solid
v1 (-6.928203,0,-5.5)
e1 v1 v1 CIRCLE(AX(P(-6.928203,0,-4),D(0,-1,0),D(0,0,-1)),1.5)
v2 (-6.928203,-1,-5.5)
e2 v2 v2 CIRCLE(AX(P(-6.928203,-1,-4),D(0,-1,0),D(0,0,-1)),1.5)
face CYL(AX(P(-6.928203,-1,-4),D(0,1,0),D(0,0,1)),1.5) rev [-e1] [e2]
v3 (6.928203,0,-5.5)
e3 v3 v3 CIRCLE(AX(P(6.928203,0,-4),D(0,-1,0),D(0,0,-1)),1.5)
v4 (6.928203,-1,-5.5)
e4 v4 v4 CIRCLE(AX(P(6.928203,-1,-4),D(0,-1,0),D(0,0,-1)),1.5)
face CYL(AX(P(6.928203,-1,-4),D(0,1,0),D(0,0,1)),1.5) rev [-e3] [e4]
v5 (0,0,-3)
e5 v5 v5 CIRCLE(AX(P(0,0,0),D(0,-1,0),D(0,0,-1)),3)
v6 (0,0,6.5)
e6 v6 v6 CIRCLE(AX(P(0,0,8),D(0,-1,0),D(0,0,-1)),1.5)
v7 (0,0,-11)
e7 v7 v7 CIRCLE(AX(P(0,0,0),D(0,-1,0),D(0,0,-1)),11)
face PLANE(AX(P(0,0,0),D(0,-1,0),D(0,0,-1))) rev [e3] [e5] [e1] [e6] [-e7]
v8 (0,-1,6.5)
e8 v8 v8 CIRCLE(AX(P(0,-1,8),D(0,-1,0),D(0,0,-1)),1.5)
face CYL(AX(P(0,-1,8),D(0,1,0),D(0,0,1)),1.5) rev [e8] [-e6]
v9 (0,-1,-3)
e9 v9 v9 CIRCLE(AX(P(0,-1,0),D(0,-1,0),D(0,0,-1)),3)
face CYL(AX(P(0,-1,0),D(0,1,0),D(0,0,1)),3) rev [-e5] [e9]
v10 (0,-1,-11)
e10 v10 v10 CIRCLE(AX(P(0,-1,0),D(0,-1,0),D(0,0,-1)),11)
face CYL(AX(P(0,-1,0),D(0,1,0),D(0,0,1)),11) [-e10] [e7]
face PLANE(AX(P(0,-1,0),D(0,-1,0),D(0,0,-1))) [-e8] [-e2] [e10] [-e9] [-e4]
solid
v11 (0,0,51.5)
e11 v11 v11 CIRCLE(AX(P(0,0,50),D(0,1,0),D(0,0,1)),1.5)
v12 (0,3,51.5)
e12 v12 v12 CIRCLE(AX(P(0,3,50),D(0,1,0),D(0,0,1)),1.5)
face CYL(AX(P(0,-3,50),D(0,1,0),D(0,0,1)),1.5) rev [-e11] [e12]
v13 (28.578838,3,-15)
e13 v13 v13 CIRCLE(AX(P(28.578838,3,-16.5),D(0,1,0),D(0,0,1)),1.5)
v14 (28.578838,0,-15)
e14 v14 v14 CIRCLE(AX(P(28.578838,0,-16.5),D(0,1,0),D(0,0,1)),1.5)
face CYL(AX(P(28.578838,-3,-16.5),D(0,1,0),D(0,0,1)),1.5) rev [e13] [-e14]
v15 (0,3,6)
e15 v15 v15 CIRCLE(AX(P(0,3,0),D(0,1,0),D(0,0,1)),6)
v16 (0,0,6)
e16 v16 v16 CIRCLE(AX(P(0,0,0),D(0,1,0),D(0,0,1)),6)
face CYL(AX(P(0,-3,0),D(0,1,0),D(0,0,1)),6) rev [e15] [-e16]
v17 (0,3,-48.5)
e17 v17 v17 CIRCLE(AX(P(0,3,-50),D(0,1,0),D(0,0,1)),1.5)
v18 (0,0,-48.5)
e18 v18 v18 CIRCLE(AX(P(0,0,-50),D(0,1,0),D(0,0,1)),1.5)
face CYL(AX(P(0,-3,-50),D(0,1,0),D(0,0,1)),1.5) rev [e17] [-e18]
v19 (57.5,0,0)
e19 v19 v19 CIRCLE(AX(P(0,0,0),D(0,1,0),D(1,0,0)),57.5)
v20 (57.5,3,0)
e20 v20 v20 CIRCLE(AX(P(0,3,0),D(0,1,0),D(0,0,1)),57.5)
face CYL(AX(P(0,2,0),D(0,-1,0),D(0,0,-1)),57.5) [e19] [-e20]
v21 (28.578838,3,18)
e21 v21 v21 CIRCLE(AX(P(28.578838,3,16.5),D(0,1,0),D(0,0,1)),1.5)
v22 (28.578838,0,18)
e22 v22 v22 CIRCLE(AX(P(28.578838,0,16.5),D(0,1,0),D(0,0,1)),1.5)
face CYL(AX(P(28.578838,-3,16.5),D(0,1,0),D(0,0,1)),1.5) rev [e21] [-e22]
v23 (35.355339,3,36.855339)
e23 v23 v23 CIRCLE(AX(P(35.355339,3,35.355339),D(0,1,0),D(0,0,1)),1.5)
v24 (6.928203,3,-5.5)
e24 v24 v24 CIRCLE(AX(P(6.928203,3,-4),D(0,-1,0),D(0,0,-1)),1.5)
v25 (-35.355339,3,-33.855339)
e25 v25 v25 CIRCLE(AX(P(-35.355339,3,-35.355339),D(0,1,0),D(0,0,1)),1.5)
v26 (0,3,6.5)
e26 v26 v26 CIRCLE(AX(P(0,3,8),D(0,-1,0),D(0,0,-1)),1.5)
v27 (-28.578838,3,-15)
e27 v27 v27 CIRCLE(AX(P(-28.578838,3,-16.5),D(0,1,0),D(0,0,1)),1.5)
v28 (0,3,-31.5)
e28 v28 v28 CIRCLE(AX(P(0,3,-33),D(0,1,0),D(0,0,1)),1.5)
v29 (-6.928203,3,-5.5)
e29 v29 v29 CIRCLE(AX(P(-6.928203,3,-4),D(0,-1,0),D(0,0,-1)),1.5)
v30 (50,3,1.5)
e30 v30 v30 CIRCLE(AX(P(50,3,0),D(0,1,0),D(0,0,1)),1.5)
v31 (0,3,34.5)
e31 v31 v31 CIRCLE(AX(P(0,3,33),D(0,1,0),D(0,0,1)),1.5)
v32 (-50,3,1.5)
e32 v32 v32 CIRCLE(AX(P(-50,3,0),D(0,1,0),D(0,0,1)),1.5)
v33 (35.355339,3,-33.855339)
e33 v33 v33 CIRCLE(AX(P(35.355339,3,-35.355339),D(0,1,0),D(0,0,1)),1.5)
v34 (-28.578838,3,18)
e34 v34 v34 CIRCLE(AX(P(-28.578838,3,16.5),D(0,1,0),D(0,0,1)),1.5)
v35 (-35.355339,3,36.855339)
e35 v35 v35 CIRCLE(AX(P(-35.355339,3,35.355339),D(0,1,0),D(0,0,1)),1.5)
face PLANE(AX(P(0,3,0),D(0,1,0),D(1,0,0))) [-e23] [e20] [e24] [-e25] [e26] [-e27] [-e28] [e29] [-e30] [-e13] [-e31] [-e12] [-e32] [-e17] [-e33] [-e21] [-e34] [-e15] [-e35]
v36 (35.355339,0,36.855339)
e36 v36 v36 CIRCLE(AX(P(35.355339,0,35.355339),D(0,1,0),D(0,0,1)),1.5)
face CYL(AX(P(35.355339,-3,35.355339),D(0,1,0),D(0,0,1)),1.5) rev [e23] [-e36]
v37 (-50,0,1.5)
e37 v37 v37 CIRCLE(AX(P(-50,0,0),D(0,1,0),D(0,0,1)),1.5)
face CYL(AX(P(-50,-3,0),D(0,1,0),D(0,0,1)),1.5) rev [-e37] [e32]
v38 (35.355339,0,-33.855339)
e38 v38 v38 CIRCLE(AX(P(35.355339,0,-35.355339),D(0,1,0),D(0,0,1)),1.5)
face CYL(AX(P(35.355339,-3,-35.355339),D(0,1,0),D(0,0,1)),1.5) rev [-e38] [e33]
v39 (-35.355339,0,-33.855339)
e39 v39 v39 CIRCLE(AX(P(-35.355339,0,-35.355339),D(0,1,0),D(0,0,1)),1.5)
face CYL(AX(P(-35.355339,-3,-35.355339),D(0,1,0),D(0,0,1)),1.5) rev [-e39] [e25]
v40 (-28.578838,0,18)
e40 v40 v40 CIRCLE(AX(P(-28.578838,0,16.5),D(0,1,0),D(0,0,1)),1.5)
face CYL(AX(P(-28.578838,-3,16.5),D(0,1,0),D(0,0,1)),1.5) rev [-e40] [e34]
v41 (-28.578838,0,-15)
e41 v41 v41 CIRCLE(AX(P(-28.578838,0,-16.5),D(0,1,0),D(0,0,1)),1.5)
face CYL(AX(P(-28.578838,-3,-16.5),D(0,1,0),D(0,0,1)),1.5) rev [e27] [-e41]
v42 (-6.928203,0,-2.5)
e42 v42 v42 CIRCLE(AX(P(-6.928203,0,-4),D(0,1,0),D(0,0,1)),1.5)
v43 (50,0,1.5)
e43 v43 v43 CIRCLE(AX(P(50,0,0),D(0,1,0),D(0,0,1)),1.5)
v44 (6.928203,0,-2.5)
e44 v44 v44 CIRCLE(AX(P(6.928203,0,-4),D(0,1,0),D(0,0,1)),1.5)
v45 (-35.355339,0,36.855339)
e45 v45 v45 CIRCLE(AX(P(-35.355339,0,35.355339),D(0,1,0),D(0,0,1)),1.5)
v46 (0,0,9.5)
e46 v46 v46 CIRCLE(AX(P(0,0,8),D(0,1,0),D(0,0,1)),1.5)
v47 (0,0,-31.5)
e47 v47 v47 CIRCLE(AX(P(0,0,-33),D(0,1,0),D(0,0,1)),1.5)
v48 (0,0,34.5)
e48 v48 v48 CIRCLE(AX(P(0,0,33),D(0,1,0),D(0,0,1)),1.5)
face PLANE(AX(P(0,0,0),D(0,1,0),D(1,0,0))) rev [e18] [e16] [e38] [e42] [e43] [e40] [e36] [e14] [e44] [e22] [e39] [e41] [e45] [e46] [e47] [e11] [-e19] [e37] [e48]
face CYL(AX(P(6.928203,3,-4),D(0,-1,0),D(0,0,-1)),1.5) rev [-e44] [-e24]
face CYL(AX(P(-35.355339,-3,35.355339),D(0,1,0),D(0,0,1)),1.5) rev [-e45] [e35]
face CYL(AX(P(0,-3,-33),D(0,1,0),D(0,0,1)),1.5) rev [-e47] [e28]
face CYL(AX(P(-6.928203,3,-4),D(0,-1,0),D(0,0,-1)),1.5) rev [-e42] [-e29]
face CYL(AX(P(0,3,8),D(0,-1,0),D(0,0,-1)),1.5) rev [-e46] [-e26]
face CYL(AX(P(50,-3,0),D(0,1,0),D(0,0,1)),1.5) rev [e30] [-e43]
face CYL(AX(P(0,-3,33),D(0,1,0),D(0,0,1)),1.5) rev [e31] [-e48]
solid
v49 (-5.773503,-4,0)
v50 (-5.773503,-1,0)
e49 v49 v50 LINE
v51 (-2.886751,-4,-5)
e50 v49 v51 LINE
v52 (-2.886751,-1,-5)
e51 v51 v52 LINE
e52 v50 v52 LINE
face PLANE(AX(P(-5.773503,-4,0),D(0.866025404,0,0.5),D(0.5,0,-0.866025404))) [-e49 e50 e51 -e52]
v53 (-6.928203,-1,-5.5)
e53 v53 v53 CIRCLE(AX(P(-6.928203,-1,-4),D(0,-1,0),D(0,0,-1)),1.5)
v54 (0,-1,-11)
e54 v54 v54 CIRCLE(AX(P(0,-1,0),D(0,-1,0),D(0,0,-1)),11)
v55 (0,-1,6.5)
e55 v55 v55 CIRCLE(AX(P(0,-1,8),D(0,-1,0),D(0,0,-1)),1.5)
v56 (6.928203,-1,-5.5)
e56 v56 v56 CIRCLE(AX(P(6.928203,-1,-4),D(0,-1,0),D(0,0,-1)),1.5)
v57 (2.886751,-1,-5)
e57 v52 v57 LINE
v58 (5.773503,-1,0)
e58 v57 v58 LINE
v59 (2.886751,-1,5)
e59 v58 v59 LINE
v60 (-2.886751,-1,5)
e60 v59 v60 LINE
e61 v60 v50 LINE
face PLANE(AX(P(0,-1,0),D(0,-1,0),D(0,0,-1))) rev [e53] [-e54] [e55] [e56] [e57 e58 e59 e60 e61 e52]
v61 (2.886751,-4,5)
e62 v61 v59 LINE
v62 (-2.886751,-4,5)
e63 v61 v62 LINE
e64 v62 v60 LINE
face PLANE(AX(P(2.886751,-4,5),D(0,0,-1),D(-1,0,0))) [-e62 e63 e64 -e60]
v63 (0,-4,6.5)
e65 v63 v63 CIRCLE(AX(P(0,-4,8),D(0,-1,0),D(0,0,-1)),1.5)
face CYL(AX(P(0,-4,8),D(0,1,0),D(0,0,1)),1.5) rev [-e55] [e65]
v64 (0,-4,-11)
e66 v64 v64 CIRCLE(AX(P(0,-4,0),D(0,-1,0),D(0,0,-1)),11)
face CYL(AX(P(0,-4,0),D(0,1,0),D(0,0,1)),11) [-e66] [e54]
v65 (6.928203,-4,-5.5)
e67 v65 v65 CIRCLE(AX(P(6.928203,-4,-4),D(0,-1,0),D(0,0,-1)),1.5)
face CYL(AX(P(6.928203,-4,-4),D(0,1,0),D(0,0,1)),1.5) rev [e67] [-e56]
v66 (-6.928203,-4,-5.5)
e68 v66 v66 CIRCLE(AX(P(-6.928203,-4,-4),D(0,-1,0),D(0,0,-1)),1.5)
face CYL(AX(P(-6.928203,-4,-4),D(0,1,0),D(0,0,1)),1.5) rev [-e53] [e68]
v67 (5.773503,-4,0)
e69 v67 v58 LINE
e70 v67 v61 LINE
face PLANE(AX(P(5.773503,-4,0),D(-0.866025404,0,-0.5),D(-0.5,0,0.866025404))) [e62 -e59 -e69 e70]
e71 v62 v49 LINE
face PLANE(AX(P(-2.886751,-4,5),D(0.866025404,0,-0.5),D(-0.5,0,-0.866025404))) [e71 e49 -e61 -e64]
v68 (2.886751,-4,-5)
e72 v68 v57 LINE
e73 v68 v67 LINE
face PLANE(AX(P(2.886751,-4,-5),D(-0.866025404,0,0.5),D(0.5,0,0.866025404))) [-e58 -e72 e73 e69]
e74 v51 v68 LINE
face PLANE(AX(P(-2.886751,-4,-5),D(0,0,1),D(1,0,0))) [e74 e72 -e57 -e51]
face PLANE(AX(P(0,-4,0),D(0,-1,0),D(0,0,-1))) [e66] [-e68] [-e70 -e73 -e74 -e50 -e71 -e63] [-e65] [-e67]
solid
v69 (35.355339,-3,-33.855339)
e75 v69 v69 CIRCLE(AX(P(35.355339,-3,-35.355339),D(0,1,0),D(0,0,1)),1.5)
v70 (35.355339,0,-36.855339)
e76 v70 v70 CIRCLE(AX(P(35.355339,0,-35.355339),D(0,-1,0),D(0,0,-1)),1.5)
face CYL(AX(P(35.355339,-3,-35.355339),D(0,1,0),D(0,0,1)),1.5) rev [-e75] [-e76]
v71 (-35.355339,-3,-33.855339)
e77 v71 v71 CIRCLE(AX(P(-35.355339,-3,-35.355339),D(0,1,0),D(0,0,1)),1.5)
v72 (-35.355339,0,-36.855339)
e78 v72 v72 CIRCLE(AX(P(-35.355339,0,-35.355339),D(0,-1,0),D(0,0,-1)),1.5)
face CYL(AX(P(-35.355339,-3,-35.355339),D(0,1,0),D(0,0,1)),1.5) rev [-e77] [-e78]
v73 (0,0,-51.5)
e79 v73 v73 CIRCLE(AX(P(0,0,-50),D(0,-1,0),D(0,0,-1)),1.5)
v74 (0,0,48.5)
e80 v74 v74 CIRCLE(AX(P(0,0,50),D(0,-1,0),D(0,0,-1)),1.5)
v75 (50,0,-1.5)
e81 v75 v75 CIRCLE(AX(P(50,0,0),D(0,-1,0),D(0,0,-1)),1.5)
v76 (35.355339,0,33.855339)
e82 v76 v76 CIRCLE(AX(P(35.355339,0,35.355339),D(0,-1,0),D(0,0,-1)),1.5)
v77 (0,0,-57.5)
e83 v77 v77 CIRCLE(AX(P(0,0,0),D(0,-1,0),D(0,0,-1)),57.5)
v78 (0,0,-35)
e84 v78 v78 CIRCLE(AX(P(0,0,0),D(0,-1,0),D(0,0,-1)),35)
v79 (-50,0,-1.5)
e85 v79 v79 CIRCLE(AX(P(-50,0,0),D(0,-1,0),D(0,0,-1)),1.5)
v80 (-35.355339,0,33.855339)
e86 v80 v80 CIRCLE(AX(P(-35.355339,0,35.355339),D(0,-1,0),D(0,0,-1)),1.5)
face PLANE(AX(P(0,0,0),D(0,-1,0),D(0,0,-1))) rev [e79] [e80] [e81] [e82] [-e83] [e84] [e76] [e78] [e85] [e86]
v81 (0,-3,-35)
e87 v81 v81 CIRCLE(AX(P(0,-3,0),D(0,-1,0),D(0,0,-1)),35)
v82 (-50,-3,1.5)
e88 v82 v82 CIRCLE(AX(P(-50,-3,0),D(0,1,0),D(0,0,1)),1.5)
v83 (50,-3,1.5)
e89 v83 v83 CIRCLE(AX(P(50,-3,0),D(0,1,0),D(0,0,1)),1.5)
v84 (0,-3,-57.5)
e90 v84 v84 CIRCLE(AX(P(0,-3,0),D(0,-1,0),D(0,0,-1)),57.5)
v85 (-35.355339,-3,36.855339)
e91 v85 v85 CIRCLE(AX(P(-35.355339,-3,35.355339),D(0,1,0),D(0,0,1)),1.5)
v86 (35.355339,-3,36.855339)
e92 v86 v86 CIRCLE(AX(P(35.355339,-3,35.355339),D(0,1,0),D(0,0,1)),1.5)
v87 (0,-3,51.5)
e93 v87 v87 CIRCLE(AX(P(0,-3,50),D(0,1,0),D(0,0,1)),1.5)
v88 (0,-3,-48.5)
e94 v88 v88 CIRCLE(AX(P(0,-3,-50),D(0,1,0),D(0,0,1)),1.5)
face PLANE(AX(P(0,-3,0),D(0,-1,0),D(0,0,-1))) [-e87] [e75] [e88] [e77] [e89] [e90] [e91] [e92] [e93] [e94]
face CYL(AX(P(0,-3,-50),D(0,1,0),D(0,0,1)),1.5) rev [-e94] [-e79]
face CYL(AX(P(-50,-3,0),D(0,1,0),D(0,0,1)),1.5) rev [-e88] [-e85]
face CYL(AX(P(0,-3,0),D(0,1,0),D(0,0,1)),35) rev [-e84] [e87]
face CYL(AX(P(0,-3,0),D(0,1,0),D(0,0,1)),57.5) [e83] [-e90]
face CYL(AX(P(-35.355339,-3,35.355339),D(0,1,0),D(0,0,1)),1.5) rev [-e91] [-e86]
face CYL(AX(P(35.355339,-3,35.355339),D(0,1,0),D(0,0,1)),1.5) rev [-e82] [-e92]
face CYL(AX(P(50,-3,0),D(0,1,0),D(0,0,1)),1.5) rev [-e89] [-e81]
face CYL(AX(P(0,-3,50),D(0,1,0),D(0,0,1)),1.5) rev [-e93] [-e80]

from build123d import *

# Parameters (mm, degrees)
DELETEFACE1_OUTLINE_R   = 57.5
DELETEFACE1_DEPTH       = 2
SKETCH2_R               = 57.5
SKETCH2_R_2             = 35
BOSS_EXTRUDE1_DEPTH     = 3
SKETCH3_R               = 1.5
CUT_EXTRUDE1_DEPTH      = 82.470853684
MOVE_FACE1_BY           = 1
SKETCH5_R               = 1.5
SKETCH5_R_2             = 6
CUT_EXTRUDE3_DEPTH      = 82.538334543
SKETCH6_R               = 11
SKETCH6_R_2             = 1.5
BOSS_EXTRUDE2_DEPTH     = 3
SKETCH7_R               = 11
SKETCH7_R_2             = 3
SKETCH7_R_3             = 1.5
BOSS_EXTRUDE3_DEPTH     = 1
CUT_EXTRUDE4_DEPTH      = 82.618012718
CUT_EXTRUDE4_DEPTH_BACK = 82.618012718
SKETCH8_R               = 1.5


with BuildPart() as part:
    # DeleteFace1: read off the stored shape, not the designer's step
    # DeleteFace1 outline → DeleteFace1 (new body)
    with BuildSketch(Plane(origin=(0, 0, 0), x_dir=(1, 0, 0), z_dir=(0, 1, 0))):
        Circle(DELETEFACE1_OUTLINE_R)
    extrude(amount=DELETEFACE1_DEPTH)


with BuildPart() as body_2:
    # Sketch2 → Boss-Extrude1 (new body)
    with BuildSketch(Plane.XZ):
        with Locations(Location((0, 0, 0), (0, 0, 270))):
            Circle(SKETCH2_R)
        with Locations(Location((0, 0, 0), (0, 0, 270))):
            Circle(SKETCH2_R_2, mode=Mode.SUBTRACT)
    extrude(amount=BOSS_EXTRUDE1_DEPTH)


with BuildPart() as cut_extrude1_tool:
    # Sketch3 → Cut-Extrude1 (new, through all)
    with BuildSketch(Plane(origin=(0, 2, 0), x_dir=(1, 0, 0), z_dir=(0, 1, 0))):
        with Locations(Location((35.355339059, 35.355339059, 0), (0, 0, 270))):
            Circle(SKETCH3_R)
        with Locations(Location((50, 0, 0), (0, 0, 270))):
            Circle(SKETCH3_R)
        with Locations(Location((35.355339059, -35.355339059, 0), (0, 0, 270))):
            Circle(SKETCH3_R)
        with Locations(Location((0, -50, 0), (0, 0, 270))):
            Circle(SKETCH3_R)
        with Locations(Location((-35.355339059, -35.355339059, 0), (0, 0, 270))):
            Circle(SKETCH3_R)
        with Locations(Location((-50, 0, 0), (0, 0, 270))):
            Circle(SKETCH3_R)
        with Locations(Location((0, 50, 0), (0, 0, 270))):
            Circle(SKETCH3_R)
        with Locations(Location((-35.355339059, 35.355339059, 0), (0, 0, 270))):
            Circle(SKETCH3_R)
    extrude(amount=-CUT_EXTRUDE1_DEPTH)


with BuildPart() as part_1:
    add(part.part)

    # Cut-Extrude1: cut by cut_extrude1_tool
    add(cut_extrude1_tool.part, mode=Mode.SUBTRACT)

    # Move Face1: a face moved outward by 1.0
    extrude(part_1.faces().sort_by_distance((0, 2, 0))[0], amount=MOVE_FACE1_BY, dir=(0, 1, 0))

    # Sketch5 → Cut-Extrude3 (cut, through all)
    with BuildSketch(Plane(origin=(0, 3, 0), x_dir=(1, 0, 0), z_dir=(0, 1, 0))):
        with Locations(Location((0, 33, 0), (0, 0, 270))):
            Circle(SKETCH5_R)
        with Locations(Location((28.578838325, 16.5, 0), (0, 0, 270))):
            Circle(SKETCH5_R)
        with Locations(Location((28.578838325, -16.5, 0), (0, 0, 270))):
            Circle(SKETCH5_R)
        with Locations(Location((0, -33, 0), (0, 0, 270))):
            Circle(SKETCH5_R)
        with Locations(Location((-28.578838325, -16.5, 0), (0, 0, 270))):
            Circle(SKETCH5_R)
        with Locations(Location((-28.578838325, 16.5, 0), (0, 0, 270))):
            Circle(SKETCH5_R)
        with Locations(Location((0, 0, 0), (0, 0, 270))):
            Circle(SKETCH5_R_2)
    extrude(amount=-CUT_EXTRUDE3_DEPTH, mode=Mode.SUBTRACT)

    # Sketch8 → Cut-Extrude4 (cut, two sides: drawn at the far end of the back side and taken through both)
    with BuildSketch(Plane.XZ.offset(4).offset(-CUT_EXTRUDE4_DEPTH_BACK)):
        with Locations(Location((6.92820323, -4, 0), (0, 0, 270))):
            Circle(SKETCH8_R)
        with Locations(Location((-6.92820323, -4, 0), (0, 0, 270))):
            Circle(SKETCH8_R)
        with Locations(Location((0, 8, 0), (0, 0, 270))):
            Circle(SKETCH8_R)
    extrude(amount=CUT_EXTRUDE4_DEPTH + CUT_EXTRUDE4_DEPTH_BACK, mode=Mode.SUBTRACT)


with BuildPart() as body_2_1:
    add(body_2.part)

    # Cut-Extrude1: cut by cut_extrude1_tool
    add(cut_extrude1_tool.part, mode=Mode.SUBTRACT)


with BuildPart() as body_3:
    # Sketch6 → Boss-Extrude2 (new body)
    with BuildSketch(Plane.XZ):
        with Locations(Location((0, 0, 0), (0, 0, 270))):
            Circle(SKETCH6_R)
        with Locations(Location((0, 8, 0), (0, 0, 270))):
            Circle(SKETCH6_R_2, mode=Mode.SUBTRACT)
        with Locations(Location((6.92820323, -4, 0), (0, 0, 270))):
            Circle(SKETCH6_R_2, mode=Mode.SUBTRACT)
        with Locations(Location((-6.92820323, -4, 0), (0, 0, 270))):
            Circle(SKETCH6_R_2, mode=Mode.SUBTRACT)
        Polygon((-2.886751346, 5), (-5.773502692, 0), (-2.886751346, -5), (2.886751346, -5), (5.773502692, 0), (2.886751346, 5), align=None, mode=Mode.SUBTRACT)
    extrude(amount=BOSS_EXTRUDE2_DEPTH)


with BuildPart() as body_4:
    # Sketch7 → Boss-Extrude3 (new body)
    with BuildSketch(Plane.XZ):
        with Locations(Location((0, 0, 0), (0, 0, 270))):
            Circle(SKETCH7_R)
        with Locations(Location((0, 0, 0), (0, 0, 270))):
            Circle(SKETCH7_R_2, mode=Mode.SUBTRACT)
        with Locations(Location((6.92820323, -4, 0), (0, 0, 270))):
            Circle(SKETCH7_R_3, mode=Mode.SUBTRACT)
        with Locations(Location((0, 8, 0), (0, 0, 270))):
            Circle(SKETCH7_R_3, mode=Mode.SUBTRACT)
        with Locations(Location((-6.92820323, -4, 0), (0, 0, 270))):
            Circle(SKETCH7_R_3, mode=Mode.SUBTRACT)
    extrude(amount=BOSS_EXTRUDE3_DEPTH)


with BuildPart() as body_3_1:
    # Body-Move/Copy1: moved
    add(body_3.part.moved(Location((0, -1, 0))))


solid = Compound([part_1.part, body_2_1.part, body_4.part, body_3_1.part])
